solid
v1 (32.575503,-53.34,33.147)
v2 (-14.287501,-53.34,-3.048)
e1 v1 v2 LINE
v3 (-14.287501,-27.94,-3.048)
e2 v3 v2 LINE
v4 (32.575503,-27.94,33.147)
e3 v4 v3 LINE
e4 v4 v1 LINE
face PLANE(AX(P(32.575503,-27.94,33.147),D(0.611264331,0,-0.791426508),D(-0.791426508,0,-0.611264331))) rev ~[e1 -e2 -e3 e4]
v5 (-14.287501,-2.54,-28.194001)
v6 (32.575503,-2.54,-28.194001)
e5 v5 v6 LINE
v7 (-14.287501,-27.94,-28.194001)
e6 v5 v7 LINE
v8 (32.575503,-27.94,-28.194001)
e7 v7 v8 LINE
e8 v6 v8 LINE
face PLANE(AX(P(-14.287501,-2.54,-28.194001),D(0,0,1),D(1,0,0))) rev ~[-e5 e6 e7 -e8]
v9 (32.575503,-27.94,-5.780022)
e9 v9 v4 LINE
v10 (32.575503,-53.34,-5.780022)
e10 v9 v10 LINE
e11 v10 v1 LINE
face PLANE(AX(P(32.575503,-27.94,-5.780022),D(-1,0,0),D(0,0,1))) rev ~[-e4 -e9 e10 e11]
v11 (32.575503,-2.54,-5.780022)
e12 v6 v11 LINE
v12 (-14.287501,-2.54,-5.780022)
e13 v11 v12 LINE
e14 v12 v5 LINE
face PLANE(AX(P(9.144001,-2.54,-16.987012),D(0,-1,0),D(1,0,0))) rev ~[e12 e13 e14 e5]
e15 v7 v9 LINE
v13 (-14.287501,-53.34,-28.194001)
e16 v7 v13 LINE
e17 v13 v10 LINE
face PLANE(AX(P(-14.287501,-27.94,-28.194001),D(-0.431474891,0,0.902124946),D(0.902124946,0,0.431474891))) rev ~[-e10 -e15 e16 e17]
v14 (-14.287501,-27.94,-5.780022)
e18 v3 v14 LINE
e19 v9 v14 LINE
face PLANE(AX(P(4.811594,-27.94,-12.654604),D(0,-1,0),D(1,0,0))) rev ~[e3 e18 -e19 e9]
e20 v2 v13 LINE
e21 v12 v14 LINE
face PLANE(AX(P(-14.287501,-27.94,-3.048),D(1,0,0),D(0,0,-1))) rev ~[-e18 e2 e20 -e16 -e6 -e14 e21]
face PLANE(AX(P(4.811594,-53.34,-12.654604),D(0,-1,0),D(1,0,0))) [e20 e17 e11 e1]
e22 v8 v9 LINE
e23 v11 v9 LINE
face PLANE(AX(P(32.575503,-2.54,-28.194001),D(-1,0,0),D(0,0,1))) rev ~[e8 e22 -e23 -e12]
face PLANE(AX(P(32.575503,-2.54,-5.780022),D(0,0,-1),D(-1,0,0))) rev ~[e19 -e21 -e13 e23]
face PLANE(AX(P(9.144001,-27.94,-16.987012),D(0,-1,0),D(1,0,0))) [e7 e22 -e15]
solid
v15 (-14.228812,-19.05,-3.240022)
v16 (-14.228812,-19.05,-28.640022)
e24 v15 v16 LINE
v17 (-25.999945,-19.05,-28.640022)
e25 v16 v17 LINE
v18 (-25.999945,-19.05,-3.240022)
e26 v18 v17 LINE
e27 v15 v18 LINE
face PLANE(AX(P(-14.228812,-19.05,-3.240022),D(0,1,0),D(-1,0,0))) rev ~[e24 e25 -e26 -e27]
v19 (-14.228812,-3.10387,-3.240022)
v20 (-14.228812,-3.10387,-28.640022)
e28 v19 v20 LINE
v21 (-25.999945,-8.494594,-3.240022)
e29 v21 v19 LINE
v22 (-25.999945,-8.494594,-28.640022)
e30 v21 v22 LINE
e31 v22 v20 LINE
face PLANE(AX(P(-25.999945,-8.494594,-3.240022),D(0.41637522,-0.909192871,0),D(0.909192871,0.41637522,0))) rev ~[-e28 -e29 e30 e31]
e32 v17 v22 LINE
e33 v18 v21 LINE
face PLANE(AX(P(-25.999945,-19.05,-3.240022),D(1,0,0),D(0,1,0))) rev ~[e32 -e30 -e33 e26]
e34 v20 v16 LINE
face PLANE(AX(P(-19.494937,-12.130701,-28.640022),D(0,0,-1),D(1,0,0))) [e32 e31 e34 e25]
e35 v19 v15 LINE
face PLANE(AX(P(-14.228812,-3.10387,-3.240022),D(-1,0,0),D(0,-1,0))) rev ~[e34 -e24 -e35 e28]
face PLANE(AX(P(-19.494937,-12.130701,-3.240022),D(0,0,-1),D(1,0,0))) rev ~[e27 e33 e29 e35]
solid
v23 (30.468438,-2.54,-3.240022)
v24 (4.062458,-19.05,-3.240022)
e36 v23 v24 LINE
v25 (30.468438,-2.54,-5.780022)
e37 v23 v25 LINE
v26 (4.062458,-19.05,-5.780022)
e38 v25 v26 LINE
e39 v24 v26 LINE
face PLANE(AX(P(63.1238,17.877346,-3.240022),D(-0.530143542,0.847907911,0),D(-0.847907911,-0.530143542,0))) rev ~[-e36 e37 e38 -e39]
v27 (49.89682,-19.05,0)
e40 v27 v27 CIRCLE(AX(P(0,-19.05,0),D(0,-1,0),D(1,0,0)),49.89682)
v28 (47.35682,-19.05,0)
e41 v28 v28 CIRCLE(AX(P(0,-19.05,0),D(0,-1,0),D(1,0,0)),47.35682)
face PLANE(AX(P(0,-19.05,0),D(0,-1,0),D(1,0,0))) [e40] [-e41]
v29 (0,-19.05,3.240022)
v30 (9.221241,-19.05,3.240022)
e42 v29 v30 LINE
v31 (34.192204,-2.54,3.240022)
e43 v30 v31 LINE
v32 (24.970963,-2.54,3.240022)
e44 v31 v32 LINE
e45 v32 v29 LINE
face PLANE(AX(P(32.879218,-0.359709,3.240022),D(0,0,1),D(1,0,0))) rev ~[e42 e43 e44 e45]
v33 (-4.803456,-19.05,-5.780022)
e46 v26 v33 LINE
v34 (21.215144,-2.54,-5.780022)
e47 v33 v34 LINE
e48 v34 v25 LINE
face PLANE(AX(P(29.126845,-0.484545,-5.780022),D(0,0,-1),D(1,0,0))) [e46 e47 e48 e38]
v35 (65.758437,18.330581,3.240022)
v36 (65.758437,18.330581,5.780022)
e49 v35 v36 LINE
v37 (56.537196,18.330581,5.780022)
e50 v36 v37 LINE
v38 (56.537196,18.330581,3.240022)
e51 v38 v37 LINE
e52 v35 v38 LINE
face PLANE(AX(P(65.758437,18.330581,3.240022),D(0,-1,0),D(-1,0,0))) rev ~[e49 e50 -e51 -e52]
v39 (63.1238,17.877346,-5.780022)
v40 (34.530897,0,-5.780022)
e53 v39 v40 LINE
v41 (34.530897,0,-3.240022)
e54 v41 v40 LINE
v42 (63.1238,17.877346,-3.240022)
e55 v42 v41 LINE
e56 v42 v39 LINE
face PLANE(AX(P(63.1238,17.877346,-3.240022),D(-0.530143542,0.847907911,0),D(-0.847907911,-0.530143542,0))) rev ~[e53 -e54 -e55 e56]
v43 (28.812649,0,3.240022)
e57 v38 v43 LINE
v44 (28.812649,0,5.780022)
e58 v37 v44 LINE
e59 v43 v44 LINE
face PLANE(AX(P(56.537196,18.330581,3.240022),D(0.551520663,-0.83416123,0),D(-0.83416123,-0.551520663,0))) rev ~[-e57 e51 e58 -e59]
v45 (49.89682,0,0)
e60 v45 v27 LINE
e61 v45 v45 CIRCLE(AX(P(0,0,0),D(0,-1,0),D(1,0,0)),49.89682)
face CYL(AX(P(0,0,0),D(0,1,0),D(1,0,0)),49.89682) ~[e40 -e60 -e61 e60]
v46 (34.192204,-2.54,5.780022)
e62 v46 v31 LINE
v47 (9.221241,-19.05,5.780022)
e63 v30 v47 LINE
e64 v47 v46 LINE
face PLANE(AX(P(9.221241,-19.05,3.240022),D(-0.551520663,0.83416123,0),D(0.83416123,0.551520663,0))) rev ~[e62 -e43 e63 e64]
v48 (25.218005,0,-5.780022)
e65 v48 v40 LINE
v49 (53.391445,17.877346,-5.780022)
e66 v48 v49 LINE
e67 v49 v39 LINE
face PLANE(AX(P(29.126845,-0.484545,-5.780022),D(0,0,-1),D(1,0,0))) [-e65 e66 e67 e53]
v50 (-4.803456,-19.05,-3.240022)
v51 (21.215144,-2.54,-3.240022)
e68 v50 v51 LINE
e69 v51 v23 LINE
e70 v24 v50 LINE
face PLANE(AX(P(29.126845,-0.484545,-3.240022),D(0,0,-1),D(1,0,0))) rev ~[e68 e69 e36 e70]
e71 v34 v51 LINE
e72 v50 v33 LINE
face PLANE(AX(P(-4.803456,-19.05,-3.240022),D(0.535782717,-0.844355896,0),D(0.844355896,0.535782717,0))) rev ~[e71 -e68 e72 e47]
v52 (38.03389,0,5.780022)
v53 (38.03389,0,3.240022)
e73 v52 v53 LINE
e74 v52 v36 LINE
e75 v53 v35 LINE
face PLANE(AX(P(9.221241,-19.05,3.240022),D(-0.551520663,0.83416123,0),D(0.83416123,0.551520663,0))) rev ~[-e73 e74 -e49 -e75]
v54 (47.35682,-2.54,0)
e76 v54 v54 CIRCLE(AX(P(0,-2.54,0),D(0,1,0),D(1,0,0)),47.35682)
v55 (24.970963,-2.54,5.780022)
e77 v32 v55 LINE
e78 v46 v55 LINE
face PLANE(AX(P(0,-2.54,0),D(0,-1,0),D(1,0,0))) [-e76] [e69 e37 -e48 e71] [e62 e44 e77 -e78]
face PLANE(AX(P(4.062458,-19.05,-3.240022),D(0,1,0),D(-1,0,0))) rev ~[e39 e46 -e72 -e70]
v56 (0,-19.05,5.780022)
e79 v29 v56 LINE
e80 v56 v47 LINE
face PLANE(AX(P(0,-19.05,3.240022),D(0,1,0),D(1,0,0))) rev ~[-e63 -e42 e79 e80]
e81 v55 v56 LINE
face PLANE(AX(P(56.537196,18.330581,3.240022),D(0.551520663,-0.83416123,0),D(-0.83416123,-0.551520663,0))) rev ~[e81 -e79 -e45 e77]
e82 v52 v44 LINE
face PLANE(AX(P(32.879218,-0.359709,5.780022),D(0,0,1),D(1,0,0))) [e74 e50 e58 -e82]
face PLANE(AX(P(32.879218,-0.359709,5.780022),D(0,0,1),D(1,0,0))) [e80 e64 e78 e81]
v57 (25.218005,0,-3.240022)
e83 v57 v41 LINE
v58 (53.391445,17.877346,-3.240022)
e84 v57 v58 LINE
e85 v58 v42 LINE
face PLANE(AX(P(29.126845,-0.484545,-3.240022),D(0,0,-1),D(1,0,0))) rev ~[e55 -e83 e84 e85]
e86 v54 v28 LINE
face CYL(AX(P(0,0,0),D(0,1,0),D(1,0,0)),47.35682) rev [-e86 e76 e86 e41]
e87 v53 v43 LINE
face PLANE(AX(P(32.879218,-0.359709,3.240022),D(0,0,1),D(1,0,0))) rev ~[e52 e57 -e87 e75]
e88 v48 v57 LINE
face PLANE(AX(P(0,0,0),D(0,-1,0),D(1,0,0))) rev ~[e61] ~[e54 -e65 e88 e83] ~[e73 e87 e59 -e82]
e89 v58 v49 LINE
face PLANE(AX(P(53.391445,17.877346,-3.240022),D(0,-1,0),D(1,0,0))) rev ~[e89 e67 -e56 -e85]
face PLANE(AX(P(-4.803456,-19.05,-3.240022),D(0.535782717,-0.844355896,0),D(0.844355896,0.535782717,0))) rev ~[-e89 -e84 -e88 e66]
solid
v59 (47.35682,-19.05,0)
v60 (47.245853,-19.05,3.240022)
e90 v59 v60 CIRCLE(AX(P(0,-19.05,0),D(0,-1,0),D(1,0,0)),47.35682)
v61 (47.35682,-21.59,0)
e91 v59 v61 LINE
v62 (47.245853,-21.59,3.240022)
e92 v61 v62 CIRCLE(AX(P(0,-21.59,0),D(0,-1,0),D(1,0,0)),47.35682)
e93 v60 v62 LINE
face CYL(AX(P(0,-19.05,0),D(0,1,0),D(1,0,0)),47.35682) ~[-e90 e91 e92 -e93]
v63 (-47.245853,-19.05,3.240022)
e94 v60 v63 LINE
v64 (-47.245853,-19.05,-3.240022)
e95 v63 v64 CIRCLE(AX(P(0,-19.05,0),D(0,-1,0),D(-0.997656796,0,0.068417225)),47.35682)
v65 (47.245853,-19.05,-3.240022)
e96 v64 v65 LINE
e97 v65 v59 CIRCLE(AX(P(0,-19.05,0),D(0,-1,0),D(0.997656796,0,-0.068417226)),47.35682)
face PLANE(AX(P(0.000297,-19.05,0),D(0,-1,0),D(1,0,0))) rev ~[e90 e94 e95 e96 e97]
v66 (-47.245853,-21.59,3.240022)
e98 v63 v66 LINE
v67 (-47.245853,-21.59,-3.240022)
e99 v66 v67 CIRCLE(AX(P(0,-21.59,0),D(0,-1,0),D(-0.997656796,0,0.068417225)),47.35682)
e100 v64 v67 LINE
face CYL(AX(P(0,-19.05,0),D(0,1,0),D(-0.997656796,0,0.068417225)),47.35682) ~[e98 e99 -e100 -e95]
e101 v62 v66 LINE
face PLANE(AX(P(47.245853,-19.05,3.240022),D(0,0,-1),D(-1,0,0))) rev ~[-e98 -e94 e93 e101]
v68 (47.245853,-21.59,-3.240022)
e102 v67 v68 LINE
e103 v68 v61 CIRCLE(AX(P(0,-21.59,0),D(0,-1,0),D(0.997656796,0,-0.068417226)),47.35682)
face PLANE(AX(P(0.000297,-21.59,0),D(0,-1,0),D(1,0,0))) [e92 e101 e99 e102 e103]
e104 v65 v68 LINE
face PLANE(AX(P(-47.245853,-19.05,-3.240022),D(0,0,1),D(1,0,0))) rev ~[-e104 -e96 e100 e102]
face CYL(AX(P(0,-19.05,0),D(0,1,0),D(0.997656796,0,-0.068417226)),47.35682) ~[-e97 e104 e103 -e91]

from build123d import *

# Parameters (mm, degrees)
F0_R      = 49.8968196512
F1_DEPTH  = 19.05
F2_T      = -2.54
F4_DEPTH  = 2.54
F6_DEPTH  = 2.54
F8_DEPTH  = 2.54
F12_DEPTH = 25.4
F14_DEPTH = 25.4
F16_DEPTH = 25.4


# Not quite as in the source:
# - a feature of the source that left no trace in its solid (it failed there, or was rolled back) is left out


with BuildPart() as f1:
    # F0 (on Front) → F1 (new body)
    with BuildSketch(Plane.XZ):
        Circle(F0_R)
    extrude(amount=F1_DEPTH)

    # F2
    f2_openings = [f1.faces().sort_by_distance(p)[0] for p in [
        (0, -19.05, 0),
    ]]
    offset(amount=F2_T, openings=f2_openings)

    # F5 (on face) → F6 (join)
    with BuildSketch(Plane.XY.offset(3.2400222074)):
        Polygon((56.5371960402, 18.3305814862), (0, -19.05), (9.2212408781, -19.05), (65.7584369183, 18.3305814862), align=None)
    extrude(amount=F6_DEPTH)

    # F7 (on face) → F8 (join)
    with BuildSketch(Plane(origin=(0, 0, -3.2400222074), x_dir=(1, 0, 0), z_dir=(0, 0, -1))):
        Polygon((4.062458419, 19.05), (-4.8034556786, 19.05), (53.3914454281, -17.8773459047), (63.1237998605, -17.8773459047), align=None)
    extrude(amount=F8_DEPTH)


with BuildPart() as f4:
    # F3 (on face) → F4 (new body)
    with BuildSketch(Plane.XZ.offset(19.05)):
        with BuildLine():
            Line((47.2458529775, 3.2400222074), (-47.2458529775, 3.2400222074))
            ThreePointArc((-47.2458529775, 3.2400222074), (-47.3568196512, 0), (-47.2458529775, -3.2400222074))
            Line((-47.2458529775, -3.2400222074), (47.2458529775, -3.2400222074))
            ThreePointArc((47.2458529775, -3.2400222074), (47.3290698525, -1.6209609424), (47.3568196512, 0))
            ThreePointArc((47.3568196512, 0), (47.3290698525, 1.6209609424), (47.2458529775, 3.2400222074))
        make_face()
    extrude(amount=F4_DEPTH)


with BuildPart() as f12:
    # F11 (on face) → F12 (new body)
    with BuildSketch(Plane(origin=(0, 0, -3.2400222074), x_dir=(1, 0, 0), z_dir=(0, 0, -1))):
        Polygon((-14.2288124189, 19.05), (-25.9999446571, 19.05), (-25.9999446571, 8.4945941344), (-14.2288124189, 3.1038702), align=None)
    extrude(amount=F12_DEPTH)


with BuildPart() as f14:
    # F13 (on face) → F14 (new body)
    with BuildSketch(Plane.XZ.offset(2.54)):
        Polygon((-14.2875006422, -5.7800222074), (-14.2875006422, -28.1940009445), (32.5755029917, -28.1940009445), (32.5755029917, -5.7800222074), (30.4684381424, -5.7800222074), (21.2151436476, -5.7800222074), align=None)
    extrude(amount=F14_DEPTH)

    # F15 (on face) → F16 (join)
    with BuildSketch(Plane.XZ.offset(27.94)):
        Polygon((-14.2875006422, -5.7800222074), (-14.2875006422, -28.1940009445), (32.5755029917, -5.7800222074), align=None)
        Polygon((-14.2875006422, -3.0480003916), (-14.2875006422, -5.7800222074), (32.5755029917, -5.7800222074), (32.5755029917, 33.1469997764), align=None)
    extrude(amount=F16_DEPTH)


solid = Compound([f1.part, f4.part, f12.part, f14.part])
